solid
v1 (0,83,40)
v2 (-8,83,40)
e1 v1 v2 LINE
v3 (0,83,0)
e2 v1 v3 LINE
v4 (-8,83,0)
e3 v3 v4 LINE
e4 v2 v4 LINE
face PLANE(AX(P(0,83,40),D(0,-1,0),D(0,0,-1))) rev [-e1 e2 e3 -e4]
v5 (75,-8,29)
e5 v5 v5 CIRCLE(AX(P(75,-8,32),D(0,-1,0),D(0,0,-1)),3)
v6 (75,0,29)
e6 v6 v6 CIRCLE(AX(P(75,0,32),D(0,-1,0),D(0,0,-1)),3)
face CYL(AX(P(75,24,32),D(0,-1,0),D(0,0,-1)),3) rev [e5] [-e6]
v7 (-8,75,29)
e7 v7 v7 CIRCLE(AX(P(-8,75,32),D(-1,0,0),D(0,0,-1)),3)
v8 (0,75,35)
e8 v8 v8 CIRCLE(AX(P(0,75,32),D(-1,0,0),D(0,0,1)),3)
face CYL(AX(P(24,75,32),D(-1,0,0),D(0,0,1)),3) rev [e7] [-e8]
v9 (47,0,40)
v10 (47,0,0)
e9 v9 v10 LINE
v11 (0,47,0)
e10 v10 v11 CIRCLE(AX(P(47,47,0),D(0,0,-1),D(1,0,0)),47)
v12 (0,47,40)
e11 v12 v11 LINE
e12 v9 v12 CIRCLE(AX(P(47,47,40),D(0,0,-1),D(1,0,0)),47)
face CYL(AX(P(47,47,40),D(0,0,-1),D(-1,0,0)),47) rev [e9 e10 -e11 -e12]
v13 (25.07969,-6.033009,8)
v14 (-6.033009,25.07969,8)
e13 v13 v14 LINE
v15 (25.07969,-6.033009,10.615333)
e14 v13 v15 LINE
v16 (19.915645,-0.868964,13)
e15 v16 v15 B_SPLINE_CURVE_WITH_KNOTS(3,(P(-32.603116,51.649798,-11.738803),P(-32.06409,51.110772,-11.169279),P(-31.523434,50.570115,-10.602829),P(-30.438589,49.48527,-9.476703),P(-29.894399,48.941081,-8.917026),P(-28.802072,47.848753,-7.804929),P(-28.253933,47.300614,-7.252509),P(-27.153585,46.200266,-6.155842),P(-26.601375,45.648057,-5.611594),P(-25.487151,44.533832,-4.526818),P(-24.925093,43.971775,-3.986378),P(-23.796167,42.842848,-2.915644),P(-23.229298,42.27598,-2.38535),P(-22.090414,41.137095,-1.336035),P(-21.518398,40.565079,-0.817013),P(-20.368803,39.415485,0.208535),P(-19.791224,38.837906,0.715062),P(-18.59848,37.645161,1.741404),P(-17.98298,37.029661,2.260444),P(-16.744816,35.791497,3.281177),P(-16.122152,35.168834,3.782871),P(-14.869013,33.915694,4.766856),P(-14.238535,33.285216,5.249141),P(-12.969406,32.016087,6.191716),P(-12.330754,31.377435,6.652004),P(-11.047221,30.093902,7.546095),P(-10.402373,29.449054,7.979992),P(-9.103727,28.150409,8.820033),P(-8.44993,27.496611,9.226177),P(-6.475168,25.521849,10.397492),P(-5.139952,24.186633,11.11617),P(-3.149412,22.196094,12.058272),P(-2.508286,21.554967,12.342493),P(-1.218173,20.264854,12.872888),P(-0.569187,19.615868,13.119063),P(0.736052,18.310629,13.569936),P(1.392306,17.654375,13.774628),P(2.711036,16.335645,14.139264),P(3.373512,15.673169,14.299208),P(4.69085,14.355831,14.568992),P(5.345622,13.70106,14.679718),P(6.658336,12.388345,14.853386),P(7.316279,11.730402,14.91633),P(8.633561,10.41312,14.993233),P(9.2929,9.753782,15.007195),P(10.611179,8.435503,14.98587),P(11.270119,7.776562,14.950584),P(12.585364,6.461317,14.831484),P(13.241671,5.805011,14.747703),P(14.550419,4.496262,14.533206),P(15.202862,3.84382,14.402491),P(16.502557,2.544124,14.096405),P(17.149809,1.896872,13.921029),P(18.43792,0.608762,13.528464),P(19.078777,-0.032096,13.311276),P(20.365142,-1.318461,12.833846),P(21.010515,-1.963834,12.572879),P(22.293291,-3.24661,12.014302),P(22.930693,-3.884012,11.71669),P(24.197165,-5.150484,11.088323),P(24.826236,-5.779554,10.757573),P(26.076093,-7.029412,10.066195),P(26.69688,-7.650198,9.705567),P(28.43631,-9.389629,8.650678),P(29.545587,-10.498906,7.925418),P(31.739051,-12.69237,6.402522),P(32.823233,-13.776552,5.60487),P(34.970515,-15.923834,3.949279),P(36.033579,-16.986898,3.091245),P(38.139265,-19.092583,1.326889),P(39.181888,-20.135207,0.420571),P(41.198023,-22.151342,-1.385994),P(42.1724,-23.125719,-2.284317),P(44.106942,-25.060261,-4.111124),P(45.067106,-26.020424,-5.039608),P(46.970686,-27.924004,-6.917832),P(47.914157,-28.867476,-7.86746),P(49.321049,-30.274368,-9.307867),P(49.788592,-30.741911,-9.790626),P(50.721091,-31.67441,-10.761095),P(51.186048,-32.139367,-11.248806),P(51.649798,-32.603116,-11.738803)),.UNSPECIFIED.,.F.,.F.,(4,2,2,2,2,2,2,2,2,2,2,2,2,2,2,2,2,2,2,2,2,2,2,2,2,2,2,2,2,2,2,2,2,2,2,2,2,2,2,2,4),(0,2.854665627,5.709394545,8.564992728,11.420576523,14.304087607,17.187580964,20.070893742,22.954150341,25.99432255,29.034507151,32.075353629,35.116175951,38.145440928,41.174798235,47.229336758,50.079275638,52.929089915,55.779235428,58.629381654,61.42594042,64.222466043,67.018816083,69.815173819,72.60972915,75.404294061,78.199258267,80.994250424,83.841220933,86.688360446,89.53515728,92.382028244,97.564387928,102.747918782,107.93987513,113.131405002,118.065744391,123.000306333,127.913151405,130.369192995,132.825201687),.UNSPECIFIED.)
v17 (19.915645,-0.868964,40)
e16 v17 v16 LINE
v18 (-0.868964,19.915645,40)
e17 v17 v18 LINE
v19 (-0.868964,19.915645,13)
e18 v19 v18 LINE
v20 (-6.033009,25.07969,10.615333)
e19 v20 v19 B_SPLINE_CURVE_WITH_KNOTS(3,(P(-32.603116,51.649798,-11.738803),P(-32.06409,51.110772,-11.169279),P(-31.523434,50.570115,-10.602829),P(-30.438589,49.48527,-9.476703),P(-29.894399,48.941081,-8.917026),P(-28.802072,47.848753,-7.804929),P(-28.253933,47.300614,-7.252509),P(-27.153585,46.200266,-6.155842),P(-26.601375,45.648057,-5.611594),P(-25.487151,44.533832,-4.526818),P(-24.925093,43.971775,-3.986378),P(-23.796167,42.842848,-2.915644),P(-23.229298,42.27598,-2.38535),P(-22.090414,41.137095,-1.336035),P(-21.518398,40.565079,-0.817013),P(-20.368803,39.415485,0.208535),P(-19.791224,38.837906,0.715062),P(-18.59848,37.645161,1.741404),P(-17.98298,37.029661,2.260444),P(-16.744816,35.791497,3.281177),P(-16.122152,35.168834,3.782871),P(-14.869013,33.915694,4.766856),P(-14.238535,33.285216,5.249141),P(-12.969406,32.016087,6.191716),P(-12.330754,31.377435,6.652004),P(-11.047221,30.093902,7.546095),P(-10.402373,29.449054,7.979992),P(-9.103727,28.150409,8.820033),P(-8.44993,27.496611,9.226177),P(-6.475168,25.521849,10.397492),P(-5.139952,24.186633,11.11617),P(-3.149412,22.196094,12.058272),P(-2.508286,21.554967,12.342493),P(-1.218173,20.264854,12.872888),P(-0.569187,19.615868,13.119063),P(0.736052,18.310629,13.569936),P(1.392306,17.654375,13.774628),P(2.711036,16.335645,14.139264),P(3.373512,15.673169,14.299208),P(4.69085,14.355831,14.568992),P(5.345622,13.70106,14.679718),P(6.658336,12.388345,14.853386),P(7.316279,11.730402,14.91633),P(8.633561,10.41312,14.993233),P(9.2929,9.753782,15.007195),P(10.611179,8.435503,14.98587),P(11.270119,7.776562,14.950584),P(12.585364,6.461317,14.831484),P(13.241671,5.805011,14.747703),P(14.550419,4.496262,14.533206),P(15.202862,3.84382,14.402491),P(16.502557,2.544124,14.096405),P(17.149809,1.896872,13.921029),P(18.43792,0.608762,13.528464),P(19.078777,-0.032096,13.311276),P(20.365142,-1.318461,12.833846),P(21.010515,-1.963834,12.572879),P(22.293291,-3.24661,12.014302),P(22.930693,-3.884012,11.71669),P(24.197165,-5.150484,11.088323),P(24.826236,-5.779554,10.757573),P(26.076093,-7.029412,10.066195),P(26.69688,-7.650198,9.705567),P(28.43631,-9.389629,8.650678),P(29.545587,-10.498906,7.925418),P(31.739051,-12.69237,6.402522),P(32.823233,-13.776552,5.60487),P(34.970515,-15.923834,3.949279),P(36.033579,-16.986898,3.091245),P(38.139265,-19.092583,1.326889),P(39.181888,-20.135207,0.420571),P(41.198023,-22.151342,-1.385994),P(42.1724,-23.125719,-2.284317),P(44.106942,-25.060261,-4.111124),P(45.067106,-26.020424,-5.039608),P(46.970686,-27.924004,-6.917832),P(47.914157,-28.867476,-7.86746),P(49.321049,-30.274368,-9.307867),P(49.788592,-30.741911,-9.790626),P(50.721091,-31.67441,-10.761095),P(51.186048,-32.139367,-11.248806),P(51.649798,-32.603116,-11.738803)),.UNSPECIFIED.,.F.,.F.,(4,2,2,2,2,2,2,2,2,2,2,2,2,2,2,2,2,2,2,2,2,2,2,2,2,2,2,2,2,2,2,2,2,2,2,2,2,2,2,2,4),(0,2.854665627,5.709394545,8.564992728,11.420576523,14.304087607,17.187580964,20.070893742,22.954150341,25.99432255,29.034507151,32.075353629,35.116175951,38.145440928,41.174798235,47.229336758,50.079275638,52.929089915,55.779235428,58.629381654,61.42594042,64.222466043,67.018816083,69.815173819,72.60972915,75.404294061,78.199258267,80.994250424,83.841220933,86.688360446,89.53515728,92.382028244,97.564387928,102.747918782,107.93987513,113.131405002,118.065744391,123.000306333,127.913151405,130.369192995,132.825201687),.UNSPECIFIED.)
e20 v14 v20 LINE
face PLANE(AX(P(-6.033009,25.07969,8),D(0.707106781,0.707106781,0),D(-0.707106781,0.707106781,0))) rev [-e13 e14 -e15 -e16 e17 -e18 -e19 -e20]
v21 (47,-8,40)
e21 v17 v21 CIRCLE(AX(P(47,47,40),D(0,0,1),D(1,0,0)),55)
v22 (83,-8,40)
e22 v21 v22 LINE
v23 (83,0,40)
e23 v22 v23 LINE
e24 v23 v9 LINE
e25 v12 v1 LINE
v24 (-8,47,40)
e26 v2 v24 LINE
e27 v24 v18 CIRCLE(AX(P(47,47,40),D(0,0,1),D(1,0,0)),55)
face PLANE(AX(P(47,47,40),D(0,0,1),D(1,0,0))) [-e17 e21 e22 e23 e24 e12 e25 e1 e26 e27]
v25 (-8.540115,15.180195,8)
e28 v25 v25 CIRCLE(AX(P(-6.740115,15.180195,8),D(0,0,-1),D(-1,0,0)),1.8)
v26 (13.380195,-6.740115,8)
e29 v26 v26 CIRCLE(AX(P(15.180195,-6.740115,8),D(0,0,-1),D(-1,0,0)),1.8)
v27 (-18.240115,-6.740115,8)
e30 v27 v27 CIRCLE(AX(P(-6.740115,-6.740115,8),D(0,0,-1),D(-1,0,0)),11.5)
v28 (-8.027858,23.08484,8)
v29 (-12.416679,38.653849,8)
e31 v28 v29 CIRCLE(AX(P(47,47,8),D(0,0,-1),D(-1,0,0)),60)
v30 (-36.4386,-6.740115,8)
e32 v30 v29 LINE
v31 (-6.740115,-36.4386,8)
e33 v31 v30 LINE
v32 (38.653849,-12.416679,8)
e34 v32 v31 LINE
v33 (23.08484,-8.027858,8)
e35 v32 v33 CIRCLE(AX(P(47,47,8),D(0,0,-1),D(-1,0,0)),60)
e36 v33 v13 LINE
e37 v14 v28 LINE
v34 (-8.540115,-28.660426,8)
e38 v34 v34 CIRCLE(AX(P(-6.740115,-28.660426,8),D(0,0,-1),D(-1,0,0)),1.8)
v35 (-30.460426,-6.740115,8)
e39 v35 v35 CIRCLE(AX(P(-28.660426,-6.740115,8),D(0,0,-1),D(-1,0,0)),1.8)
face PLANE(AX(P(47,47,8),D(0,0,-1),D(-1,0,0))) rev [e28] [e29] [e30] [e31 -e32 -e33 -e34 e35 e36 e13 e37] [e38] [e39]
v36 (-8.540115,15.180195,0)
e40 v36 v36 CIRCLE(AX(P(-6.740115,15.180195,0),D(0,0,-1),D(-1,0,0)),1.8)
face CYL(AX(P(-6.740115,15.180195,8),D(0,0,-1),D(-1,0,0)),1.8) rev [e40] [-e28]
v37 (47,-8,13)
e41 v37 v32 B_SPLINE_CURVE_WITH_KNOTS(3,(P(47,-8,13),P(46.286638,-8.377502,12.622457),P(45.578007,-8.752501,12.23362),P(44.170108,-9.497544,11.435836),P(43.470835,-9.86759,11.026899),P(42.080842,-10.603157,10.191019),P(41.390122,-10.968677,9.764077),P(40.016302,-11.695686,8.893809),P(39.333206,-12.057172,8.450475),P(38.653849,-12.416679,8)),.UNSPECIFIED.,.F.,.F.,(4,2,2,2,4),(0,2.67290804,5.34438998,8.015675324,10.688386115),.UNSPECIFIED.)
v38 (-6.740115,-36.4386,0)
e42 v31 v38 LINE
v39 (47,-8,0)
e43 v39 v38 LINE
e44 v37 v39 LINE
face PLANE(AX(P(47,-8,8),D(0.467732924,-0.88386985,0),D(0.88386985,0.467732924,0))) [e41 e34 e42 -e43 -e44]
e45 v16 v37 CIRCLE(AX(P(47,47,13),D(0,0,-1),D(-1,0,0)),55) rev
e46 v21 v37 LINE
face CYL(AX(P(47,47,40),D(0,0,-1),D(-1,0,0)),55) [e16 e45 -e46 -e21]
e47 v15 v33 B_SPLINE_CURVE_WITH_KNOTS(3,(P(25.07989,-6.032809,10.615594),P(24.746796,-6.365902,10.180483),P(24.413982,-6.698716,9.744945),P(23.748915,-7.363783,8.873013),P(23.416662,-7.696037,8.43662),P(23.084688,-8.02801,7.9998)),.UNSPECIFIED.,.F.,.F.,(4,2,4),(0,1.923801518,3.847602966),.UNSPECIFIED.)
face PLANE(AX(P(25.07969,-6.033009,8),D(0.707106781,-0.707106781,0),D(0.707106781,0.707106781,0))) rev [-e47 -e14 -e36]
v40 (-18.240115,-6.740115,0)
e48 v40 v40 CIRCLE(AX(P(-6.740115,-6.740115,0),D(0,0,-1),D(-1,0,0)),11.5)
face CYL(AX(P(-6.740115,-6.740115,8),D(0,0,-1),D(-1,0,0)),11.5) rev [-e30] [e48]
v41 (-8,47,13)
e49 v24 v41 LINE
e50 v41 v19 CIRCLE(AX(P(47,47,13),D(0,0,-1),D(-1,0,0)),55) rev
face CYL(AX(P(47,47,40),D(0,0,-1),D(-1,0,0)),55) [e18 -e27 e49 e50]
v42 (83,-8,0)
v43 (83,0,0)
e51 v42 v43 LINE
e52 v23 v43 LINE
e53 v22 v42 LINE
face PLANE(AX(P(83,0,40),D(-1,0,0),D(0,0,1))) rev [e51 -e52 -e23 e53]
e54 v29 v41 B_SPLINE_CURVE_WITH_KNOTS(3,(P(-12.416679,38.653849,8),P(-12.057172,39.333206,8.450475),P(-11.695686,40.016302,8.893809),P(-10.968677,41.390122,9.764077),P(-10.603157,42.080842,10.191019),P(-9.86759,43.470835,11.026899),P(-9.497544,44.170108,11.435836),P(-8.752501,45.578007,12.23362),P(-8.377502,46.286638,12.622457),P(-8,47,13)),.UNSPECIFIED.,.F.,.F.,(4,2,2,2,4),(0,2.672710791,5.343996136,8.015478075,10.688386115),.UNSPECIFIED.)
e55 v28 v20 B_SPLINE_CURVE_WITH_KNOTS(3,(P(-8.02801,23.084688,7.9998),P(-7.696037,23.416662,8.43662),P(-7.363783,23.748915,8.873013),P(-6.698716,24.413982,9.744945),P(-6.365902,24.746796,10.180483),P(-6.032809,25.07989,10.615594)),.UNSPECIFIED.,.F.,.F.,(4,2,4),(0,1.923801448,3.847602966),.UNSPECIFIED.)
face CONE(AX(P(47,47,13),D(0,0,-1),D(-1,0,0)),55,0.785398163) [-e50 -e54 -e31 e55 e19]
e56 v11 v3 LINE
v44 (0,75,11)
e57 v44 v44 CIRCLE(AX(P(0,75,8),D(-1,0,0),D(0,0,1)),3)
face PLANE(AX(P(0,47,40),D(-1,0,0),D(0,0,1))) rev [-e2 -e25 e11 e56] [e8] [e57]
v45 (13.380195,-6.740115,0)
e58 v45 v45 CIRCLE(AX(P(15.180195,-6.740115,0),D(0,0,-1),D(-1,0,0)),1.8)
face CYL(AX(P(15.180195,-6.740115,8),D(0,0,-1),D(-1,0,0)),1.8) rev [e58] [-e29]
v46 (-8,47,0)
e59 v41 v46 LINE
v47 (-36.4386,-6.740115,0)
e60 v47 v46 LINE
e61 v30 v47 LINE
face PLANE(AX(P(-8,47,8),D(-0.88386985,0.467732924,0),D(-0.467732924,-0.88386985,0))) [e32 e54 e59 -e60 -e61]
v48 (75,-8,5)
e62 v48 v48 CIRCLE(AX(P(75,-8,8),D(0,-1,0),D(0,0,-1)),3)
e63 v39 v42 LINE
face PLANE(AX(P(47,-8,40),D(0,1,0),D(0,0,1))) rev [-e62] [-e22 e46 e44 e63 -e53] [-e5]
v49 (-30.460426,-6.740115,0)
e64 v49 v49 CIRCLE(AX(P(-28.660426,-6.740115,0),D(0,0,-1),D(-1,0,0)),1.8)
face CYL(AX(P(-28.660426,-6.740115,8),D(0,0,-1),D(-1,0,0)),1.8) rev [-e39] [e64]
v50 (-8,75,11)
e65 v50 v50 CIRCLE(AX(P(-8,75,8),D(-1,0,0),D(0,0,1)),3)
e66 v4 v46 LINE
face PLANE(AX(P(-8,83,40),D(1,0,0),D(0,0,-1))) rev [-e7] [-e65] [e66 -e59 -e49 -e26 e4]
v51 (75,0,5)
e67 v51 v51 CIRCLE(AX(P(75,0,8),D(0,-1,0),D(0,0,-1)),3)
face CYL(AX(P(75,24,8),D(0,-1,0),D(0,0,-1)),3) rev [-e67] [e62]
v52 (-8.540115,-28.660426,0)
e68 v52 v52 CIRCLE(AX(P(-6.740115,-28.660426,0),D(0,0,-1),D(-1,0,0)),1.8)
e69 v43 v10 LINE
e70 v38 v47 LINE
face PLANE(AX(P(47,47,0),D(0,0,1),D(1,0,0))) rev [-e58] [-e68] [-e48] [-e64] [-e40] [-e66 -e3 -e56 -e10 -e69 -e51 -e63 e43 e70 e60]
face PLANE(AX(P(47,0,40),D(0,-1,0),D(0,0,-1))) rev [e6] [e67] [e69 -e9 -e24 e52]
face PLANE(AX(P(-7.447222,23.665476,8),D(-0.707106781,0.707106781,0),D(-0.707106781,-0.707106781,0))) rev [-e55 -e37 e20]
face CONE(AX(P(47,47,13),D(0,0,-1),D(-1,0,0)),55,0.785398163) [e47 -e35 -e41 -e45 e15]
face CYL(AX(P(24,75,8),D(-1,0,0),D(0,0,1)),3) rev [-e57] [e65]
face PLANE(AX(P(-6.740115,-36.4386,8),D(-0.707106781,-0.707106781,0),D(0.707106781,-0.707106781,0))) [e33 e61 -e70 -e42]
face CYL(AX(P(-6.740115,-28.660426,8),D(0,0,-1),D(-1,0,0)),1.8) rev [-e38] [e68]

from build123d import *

# Parameters (mm, degrees)
EXTRUDE_1_DEPTH     = 40
SKETCH_4_R          = 11.5
SKETCH_4_R_2        = 1.8
EXTRUDE_3_DEPTH     = 8
CHAMFER_1_SIZE      = 5
CUT_EXTRUDE_4_DEPTH = 32
SKETCH_6_R          = 3
CUT_EXTRUDE_5_DEPTH = 32
SKETCH_7_R          = 3
CUT_EXTRUDE_6_DEPTH = 32


with BuildPart() as part:
    # 草图1 → 凸台-拉伸1 (new body)
    with BuildSketch(Plane.XY):
        with BuildLine():
            Line((0, 47), (0, 83))
            Line((0, 83), (-8, 83))
            Line((-8, 83), (-8, 47))
            ThreePointArc((-8, 47), (8.109127035, 8.109127035), (47, -8))
            Line((47, -8), (83, -8))
            Line((83, -8), (83, 0))
            Line((83, 0), (47, 0))
            ThreePointArc((47, 0), (13.765981284, 13.765981284), (0, 47))
        make_face()
    extrude(amount=EXTRUDE_1_DEPTH)

    # 草图4 → 凸台-拉伸3 (add)
    with BuildSketch(Plane(origin=(0, 0, 0), x_dir=(-1, 0, 0), z_dir=(0, 0, -1))):
        with BuildLine():
            Line((6.74011537, -36.43860018), (36.43860018, -6.74011537))
            Line((36.43860018, -6.74011537), (8, 47))
            ThreePointArc((8, 47), (-8.109127035, 8.109127035), (-47, -8))
            Line((-47, -8), (6.74011537, -36.43860018))
        make_face()
        with Locations((6.74011537, -6.74011537)):
            Circle(SKETCH_4_R, mode=Mode.SUBTRACT)
        with Locations((-15.180194847, -6.74011537)):
            Circle(SKETCH_4_R_2, mode=Mode.SUBTRACT)
        with Locations((6.74011537, 15.180194847)):
            Circle(SKETCH_4_R_2, mode=Mode.SUBTRACT)
        with Locations((6.74011537, -28.660425587)):
            Circle(SKETCH_4_R_2, mode=Mode.SUBTRACT)
        with Locations((28.660425587, -6.74011537)):
            Circle(SKETCH_4_R_2, mode=Mode.SUBTRACT)
    extrude(amount=-EXTRUDE_3_DEPTH)

    # 倒角1
    # the kernel refuses this chamfer: 5 mm, written as the material it adds along each edge
    with BuildSketch(Plane(origin=(47, 47, 8), x_dir=(-0.9727737558517583, 0.23175681203810172, 0), z_dir=(0.23175681203810172, 0.9727737558517583, 0))) as chamfer_1_piece_1_section:
        Polygon((55, CHAMFER_1_SIZE), (55 + CHAMFER_1_SIZE, 0), (55, 0), align=None)
    chamfer_1_piece_1 = revolve(axis=Axis((47, 47, 8), (0, 0, 1)), revolution_arc=116.801049414, mode=Mode.PRIVATE)
    chamfer_1_piece_1 = split(chamfer_1_piece_1, bisect_by=Plane(origin=(21.227823302, -21.638315136, 10.426045108), z_dir=(-0.46773292368325514, 0.8838698502057383, 0)), keep=Keep.TOP, mode=Mode.PRIVATE)
    chamfer_1_piece_1 = split(chamfer_1_piece_1, bisect_by=Plane(origin=(-21.638315136, 21.227823302, 10.426045108), z_dir=(0.8838698502057382, -0.46773292368325536, 0)), keep=Keep.TOP, mode=Mode.PRIVATE)
    add(chamfer_1_piece_1)

    # 草图5 → 切除-拉伸4 (cut)
    with BuildSketch(Plane.XY.offset(40)):
        Polygon((-7.447222151, 23.665476221), (-6.033008589, 25.079689783), (25.079689783, -6.033008589), (23.665476221, -7.447222151), (19.271084521, -11.841613851), (-11.841613851, 19.271084521), align=None)
    extrude(amount=-CUT_EXTRUDE_4_DEPTH, mode=Mode.SUBTRACT)

    # 草图6 → 切除-拉伸5 (cut)
    with BuildSketch(Plane.XZ.offset(8)):
        with Locations(Location((75, 8, 0), (0, 0, 270))):
            Circle(SKETCH_6_R)
        with Locations(Location((75, 32, 0), (0, 0, 270))):
            Circle(SKETCH_6_R)
    extrude(amount=-CUT_EXTRUDE_5_DEPTH, mode=Mode.SUBTRACT)

    # 草图7 → 切除-拉伸6 (cut)
    with BuildSketch(Plane.ZY.offset(8)):
        with Locations((8, 75)):
            Circle(SKETCH_7_R)
        with Locations((32, 75)):
            Circle(SKETCH_7_R)
    extrude(amount=-CUT_EXTRUDE_6_DEPTH, mode=Mode.SUBTRACT)


solid = part.part
